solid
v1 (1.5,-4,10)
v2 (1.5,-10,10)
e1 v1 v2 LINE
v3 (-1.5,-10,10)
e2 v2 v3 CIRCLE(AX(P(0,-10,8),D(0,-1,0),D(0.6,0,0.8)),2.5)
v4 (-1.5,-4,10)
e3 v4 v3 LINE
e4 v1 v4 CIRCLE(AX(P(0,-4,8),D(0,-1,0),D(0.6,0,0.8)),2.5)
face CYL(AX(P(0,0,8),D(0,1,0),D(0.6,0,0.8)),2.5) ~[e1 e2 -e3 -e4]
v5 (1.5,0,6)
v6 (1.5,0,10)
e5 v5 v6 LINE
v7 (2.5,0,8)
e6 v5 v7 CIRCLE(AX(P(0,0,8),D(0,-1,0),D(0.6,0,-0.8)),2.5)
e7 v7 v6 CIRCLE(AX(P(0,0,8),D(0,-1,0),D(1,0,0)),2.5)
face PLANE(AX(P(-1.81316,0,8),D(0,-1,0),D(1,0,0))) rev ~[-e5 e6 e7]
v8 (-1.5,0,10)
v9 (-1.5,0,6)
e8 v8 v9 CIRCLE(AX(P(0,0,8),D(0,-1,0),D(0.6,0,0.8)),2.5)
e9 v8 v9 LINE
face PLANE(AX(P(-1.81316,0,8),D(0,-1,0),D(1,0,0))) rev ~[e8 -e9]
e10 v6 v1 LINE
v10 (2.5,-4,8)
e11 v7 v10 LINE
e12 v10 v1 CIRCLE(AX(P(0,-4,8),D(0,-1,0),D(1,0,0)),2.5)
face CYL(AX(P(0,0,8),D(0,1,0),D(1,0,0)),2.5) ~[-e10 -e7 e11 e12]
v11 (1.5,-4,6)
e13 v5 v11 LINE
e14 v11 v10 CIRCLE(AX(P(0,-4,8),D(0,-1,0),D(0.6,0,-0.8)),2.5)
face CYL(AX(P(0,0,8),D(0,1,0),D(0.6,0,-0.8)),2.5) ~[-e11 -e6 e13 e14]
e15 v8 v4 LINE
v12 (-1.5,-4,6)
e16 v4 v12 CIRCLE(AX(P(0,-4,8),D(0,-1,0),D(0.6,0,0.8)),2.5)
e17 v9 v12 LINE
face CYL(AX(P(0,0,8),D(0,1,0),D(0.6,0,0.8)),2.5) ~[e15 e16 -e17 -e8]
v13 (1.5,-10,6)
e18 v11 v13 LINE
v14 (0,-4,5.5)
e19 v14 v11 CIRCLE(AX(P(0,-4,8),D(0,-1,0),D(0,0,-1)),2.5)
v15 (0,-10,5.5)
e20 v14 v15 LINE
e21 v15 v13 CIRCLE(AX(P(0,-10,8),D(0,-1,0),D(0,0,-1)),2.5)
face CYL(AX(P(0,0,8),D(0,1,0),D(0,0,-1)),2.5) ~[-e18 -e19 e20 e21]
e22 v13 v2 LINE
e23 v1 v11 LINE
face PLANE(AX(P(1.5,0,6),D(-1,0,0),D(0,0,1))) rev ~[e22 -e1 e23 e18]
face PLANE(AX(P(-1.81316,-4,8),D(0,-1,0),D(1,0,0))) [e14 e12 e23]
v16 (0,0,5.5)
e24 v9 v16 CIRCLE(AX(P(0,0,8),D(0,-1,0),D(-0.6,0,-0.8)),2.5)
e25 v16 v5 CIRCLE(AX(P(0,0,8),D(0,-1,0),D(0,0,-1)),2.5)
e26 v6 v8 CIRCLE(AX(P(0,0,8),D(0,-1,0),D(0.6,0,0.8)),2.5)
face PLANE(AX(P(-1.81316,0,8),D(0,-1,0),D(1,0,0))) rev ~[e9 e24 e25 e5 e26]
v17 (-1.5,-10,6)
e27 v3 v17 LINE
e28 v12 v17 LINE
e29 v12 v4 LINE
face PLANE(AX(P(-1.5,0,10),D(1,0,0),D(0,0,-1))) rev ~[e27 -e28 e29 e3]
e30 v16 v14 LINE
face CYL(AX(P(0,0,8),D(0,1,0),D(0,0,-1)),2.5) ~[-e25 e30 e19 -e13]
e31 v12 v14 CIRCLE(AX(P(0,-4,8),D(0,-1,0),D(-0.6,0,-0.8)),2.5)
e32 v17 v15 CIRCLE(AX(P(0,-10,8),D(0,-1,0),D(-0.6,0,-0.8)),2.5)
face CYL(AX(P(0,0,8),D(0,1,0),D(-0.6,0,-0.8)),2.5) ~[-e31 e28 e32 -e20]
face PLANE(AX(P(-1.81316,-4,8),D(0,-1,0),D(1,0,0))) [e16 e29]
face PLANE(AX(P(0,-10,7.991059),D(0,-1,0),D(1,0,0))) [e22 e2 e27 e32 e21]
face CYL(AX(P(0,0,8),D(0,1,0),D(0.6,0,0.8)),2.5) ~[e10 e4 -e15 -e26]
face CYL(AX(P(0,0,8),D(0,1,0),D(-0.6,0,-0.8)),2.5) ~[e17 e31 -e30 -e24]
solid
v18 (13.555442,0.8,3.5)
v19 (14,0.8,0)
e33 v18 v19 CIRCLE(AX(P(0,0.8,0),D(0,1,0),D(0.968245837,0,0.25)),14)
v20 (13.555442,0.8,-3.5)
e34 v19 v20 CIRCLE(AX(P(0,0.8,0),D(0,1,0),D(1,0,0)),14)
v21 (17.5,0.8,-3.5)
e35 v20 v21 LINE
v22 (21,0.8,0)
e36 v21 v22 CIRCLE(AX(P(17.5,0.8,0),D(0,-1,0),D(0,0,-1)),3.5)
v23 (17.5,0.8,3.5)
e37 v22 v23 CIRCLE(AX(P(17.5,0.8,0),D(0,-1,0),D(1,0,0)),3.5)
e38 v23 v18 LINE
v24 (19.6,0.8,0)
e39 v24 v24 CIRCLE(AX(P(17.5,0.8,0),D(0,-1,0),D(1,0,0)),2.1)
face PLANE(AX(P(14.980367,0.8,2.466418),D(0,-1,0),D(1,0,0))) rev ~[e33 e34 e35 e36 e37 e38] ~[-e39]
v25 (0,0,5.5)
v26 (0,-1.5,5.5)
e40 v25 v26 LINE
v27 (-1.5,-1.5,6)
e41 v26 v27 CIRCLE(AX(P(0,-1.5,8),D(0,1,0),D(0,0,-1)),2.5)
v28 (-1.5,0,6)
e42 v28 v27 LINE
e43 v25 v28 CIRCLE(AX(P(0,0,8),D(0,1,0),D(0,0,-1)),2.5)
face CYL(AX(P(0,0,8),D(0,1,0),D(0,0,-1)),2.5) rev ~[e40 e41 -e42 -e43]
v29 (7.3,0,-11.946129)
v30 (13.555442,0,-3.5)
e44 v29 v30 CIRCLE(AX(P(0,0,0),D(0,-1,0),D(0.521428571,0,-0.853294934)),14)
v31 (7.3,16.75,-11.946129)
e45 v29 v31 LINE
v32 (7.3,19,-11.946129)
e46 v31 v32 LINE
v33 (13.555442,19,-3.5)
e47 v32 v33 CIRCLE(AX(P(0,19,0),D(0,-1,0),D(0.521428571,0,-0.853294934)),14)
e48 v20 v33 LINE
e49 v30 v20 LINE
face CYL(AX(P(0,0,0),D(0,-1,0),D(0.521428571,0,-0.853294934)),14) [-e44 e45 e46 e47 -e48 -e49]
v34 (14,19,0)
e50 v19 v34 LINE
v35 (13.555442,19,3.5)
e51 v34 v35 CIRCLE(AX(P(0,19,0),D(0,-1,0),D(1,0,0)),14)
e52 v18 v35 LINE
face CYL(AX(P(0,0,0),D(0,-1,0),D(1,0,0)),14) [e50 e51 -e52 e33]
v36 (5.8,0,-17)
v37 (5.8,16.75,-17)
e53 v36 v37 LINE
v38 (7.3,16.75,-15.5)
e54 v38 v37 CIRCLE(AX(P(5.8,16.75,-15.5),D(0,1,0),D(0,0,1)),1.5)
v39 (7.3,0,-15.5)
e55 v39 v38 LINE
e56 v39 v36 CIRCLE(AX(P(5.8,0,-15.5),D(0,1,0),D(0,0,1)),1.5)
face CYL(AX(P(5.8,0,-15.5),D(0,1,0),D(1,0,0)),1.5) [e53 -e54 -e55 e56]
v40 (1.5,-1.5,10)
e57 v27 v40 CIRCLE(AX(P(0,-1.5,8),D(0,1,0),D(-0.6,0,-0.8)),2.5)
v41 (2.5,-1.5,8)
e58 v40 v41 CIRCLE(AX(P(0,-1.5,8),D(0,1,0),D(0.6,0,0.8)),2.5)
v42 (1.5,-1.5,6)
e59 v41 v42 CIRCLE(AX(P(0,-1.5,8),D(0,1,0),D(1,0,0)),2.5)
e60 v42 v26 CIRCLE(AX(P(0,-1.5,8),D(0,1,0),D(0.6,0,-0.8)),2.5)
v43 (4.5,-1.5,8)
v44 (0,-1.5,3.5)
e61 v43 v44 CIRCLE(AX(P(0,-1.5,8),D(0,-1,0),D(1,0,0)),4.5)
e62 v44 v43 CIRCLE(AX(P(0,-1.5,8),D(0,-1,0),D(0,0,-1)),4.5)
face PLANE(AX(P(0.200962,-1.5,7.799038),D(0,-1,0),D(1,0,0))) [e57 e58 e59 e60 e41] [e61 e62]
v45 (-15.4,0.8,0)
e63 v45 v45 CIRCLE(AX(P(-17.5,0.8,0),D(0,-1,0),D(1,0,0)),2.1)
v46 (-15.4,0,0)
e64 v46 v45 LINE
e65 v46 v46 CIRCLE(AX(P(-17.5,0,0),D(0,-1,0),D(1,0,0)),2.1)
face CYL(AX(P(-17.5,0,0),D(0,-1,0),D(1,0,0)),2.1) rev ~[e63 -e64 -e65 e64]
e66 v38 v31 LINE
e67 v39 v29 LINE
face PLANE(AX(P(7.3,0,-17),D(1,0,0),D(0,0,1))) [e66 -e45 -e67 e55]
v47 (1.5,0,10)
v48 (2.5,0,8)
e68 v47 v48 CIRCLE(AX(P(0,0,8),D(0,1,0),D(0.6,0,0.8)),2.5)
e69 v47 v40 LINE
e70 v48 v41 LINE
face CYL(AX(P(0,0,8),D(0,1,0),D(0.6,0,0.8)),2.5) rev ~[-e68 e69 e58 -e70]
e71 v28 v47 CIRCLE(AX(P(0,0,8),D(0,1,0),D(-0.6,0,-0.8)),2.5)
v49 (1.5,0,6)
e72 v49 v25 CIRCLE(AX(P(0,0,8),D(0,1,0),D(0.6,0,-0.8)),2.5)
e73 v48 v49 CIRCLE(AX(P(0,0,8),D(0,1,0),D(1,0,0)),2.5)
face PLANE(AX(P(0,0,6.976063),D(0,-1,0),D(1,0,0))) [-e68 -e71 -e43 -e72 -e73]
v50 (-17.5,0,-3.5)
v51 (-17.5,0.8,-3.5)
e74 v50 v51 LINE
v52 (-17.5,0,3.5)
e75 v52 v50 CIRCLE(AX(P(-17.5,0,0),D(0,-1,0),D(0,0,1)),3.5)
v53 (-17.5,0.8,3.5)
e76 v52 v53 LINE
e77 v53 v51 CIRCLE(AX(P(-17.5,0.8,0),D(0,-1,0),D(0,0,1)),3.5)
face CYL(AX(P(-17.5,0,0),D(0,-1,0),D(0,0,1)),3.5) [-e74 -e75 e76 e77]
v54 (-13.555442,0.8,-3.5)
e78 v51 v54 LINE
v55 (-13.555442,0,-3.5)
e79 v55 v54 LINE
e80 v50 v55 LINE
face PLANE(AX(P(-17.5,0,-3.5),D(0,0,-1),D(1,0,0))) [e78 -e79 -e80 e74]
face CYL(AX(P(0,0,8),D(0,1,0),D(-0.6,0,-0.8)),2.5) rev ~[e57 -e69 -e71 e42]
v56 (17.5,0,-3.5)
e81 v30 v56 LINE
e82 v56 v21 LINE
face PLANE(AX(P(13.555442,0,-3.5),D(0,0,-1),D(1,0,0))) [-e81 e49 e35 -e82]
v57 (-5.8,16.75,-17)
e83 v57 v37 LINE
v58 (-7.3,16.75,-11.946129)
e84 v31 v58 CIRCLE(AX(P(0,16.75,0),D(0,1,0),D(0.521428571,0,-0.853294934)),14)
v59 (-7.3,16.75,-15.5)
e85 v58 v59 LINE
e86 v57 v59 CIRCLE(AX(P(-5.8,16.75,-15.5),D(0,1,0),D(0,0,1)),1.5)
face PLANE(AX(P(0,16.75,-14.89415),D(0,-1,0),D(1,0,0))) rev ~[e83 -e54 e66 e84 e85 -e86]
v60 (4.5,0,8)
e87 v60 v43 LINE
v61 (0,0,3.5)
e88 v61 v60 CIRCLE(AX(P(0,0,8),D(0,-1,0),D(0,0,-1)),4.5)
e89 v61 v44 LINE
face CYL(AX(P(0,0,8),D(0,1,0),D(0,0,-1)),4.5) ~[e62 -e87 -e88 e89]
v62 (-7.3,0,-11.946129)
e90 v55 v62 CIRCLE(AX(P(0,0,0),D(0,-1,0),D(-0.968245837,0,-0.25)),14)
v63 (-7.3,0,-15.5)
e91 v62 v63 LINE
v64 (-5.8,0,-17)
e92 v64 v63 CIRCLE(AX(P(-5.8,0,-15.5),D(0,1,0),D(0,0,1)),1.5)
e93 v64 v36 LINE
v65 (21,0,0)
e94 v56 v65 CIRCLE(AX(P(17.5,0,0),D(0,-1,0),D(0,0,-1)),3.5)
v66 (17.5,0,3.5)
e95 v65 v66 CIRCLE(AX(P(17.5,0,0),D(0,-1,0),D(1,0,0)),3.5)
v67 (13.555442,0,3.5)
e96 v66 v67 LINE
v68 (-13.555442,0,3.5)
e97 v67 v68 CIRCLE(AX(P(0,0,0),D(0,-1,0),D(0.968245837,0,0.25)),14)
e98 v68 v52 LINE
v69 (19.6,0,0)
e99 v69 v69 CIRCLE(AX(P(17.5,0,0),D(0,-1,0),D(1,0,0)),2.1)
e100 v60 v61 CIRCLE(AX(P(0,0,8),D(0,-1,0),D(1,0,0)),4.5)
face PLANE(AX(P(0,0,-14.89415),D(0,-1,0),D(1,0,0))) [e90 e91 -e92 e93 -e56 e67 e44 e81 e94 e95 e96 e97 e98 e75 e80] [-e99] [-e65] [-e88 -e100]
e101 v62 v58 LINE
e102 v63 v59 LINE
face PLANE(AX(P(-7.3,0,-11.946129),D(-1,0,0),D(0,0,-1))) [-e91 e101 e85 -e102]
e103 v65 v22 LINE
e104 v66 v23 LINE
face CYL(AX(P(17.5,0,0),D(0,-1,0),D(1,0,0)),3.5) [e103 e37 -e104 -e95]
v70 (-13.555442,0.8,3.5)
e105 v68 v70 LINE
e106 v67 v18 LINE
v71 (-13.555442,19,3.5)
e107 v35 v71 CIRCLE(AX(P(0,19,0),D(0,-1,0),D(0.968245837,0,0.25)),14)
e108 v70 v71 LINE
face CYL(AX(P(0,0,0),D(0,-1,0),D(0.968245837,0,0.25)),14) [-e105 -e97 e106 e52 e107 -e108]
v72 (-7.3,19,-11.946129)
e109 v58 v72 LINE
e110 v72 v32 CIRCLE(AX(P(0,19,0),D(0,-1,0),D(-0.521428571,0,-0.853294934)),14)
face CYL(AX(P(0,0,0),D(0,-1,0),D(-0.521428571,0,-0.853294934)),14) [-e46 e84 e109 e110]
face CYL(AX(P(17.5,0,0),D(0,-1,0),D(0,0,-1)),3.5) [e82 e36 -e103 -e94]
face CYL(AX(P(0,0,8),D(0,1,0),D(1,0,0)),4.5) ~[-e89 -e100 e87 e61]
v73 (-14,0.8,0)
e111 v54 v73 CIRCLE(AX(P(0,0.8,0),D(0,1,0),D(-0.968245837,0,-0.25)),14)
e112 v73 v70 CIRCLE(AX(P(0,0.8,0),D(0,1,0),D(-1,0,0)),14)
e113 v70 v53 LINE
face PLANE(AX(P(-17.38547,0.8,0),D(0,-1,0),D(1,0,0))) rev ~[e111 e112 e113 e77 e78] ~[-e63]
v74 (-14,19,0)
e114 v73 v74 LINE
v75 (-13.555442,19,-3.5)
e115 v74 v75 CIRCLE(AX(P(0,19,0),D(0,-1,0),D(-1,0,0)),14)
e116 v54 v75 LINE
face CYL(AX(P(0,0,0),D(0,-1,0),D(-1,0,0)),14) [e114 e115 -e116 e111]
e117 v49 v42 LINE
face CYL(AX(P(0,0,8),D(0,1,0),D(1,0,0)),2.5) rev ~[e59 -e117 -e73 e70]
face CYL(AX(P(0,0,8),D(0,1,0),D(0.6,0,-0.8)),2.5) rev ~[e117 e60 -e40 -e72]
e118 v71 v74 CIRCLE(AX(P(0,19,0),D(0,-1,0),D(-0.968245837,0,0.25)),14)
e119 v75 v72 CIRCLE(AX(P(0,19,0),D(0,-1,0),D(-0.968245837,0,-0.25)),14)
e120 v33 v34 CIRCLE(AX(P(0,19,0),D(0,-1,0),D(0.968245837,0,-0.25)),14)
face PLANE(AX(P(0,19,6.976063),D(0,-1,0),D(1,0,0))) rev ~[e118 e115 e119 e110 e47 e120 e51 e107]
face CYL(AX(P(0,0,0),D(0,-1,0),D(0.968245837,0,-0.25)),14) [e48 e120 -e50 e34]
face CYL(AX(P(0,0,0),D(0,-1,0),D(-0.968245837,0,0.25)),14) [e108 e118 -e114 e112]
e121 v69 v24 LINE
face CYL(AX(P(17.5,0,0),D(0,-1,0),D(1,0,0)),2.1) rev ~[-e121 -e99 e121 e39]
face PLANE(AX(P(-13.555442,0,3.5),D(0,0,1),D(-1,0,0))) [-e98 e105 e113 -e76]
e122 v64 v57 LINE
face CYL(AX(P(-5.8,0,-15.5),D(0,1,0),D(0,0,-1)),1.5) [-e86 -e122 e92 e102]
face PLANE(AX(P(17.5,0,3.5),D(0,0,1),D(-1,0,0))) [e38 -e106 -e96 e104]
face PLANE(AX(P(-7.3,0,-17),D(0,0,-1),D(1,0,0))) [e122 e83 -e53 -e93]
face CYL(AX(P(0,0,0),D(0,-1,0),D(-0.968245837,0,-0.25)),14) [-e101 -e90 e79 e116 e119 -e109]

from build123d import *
from build123d import SkipClean  # not in build123d's __all__

# Parameters (mm, degrees)
F1_DEPTH = 1.5
F2_DEPTH = 19
F0_R     = 2.1
F3_DEPTH = 0.8
F4_DEPTH = 4
F5_DEPTH = 10
F6_DEPTH = 16.75
F7_R     = 1.5


with BuildPart() as f1:
    # F0 (on Front) → F1 (new body)
    with BuildSketch(Plane.XZ):
        with BuildLine():
            ThreePointArc((4.5, 8), (-3.1819805153, 11.1819805153), (0, 3.5))
            ThreePointArc((0, 3.5), (3.1819805153, 4.8180194847), (4.5, 8))
        make_face()
        with BuildLine():
            ThreePointArc((1.5, 6), (0.790569415, 5.6282917549), (0, 5.5))
            ThreePointArc((0, 5.5), (-0.790569415, 5.6282917549), (-1.5, 6))
            ThreePointArc((-1.5, 6), (-2.5, 8), (-1.5, 10))
            ThreePointArc((-1.5, 10), (0, 10.5), (1.5, 10))
            ThreePointArc((1.5, 10), (2.2360679775, 9.1180339887), (2.5, 8))
            ThreePointArc((2.5, 8), (2.2360679775, 6.8819660113), (1.5, 6))
        make_face(mode=Mode.SUBTRACT)
    extrude(amount=F1_DEPTH)

    # F0 (on Front) → F2 (join)
    with BuildSketch(Plane.XZ):
        with BuildLine():
            Line((0, 3.5), (13.5554417117, 3.5))
            ThreePointArc((13.5554417117, 3.5), (0, 14), (-13.5554417117, 3.5))
            Line((-13.5554417117, 3.5), (0, 3.5))
        make_face()
        with BuildLine():
            ThreePointArc((4.5, 8), (3.1819805153, 4.8180194847), (0, 3.5))
            ThreePointArc((0, 3.5), (-3.1819805153, 11.1819805153), (4.5, 8))
        make_face(mode=Mode.SUBTRACT)
        with BuildLine():
            ThreePointArc((-13.5554417117, -3.5), (-11.250406053, -8.3323684294), (-7.3, -11.9461290802))
            Line((-7.3, -11.9461290802), (-7.3, -3.5))
            Line((-7.3, -3.5), (-13.5554417117, -3.5))
        make_face()
        with BuildLine():
            ThreePointArc((4.5, 8), (-3.1819805153, 11.1819805153), (0, 3.5))
            ThreePointArc((0, 3.5), (3.1819805153, 4.8180194847), (4.5, 8))
        make_face()
        with BuildLine():
            ThreePointArc((1.5, 6), (0.790569415, 5.6282917549), (0, 5.5))
            ThreePointArc((0, 5.5), (-0.790569415, 5.6282917549), (-1.5, 6))
            ThreePointArc((-1.5, 6), (-2.5, 8), (-1.5, 10))
            ThreePointArc((-1.5, 10), (0, 10.5), (1.5, 10))
            ThreePointArc((1.5, 10), (2.2360679775, 9.1180339887), (2.5, 8))
            ThreePointArc((2.5, 8), (2.2360679775, 6.8819660113), (1.5, 6))
        make_face(mode=Mode.SUBTRACT)
        with BuildLine():
            ThreePointArc((-1.5, 10), (-2.5, 8), (-1.5, 6))
            Line((-1.5, 6), (-1.5, 10))
        make_face()
        with BuildLine():
            Line((1.5, 10), (1.5, 6))
            ThreePointArc((1.5, 6), (2.2360679775, 6.8819660113), (2.5, 8))
            ThreePointArc((2.5, 8), (2.2360679775, 9.1180339887), (1.5, 10))
        make_face()
        with BuildLine():
            ThreePointArc((-1.5, 6), (-0.790569415, 5.6282917549), (0, 5.5))
            ThreePointArc((0, 5.5), (0.790569415, 5.6282917549), (1.5, 6))
            Line((1.5, 6), (1.5, 10))
            ThreePointArc((1.5, 10), (0, 10.5), (-1.5, 10))
            Line((-1.5, 10), (-1.5, 6))
        make_face()
        with BuildLine():
            ThreePointArc((13.5554417117, -3.5), (13.8884157477, -1.7640600948), (14, 0))
            ThreePointArc((14, 0), (13.8884157477, 1.7640600948), (13.5554417117, 3.5))
            Line((13.5554417117, 3.5), (0, 3.5))
            Line((0, 3.5), (-13.5554417117, 3.5))
            ThreePointArc((-13.5554417117, 3.5), (-13.8884157477, 1.7640600948), (-14, 0))
            ThreePointArc((-14, 0), (-13.8884157477, -1.7640600948), (-13.5554417117, -3.5))
            Line((-13.5554417117, -3.5), (-7.3, -3.5))
            Line((-7.3, -3.5), (7.3, -3.5))
            Line((7.3, -3.5), (13.5554417117, -3.5))
        make_face()
        with BuildLine():
            ThreePointArc((-7.3, -11.9461290802), (0, -14), (7.3, -11.9461290802))
            Line((7.3, -11.9461290802), (7.3, -3.5))
            Line((7.3, -3.5), (-7.3, -3.5))
            Line((-7.3, -3.5), (-7.3, -11.9461290802))
        make_face()
        with BuildLine():
            ThreePointArc((7.3, -11.9461290802), (11.250406053, -8.3323684294), (13.5554417117, -3.5))
            Line((13.5554417117, -3.5), (7.3, -3.5))
            Line((7.3, -3.5), (7.3, -11.9461290802))
        make_face()
    extrude(amount=-F2_DEPTH)

    # F0 (on Front) → F3 (join)
    with BuildSketch(Plane.XZ):
        with BuildLine():
            ThreePointArc((-17.5, -3.5), (-15.0251262658, -2.4748737342), (-14, 0))
            ThreePointArc((-14, 0), (-15.0251262658, 2.4748737342), (-17.5, 3.5))
            ThreePointArc((-17.5, 3.5), (-21, 0), (-17.5, -3.5))
        make_face()
        with Locations((-17.5, 0)):
            Circle(F0_R, mode=Mode.SUBTRACT)
        with BuildLine():
            ThreePointArc((-14, 0), (-13.8884157477, 1.7640600948), (-13.5554417117, 3.5))
            Line((-13.5554417117, 3.5), (-17.5, 3.5))
            ThreePointArc((-17.5, 3.5), (-15.0251262658, 2.4748737342), (-14, 0))
        make_face()
        with BuildLine():
            ThreePointArc((-13.5554417117, -3.5), (-13.8884157477, -1.7640600948), (-14, 0))
            ThreePointArc((-14, 0), (-15.0251262658, -2.4748737342), (-17.5, -3.5))
            Line((-17.5, -3.5), (-13.5554417117, -3.5))
        make_face()
        with BuildLine():
            ThreePointArc((13.5554417117, 3.5), (13.8884157477, 1.7640600948), (14, 0))
            ThreePointArc((14, 0), (15.0251262658, 2.4748737342), (17.5, 3.5))
            Line((17.5, 3.5), (13.5554417117, 3.5))
        make_face()
        with BuildLine():
            ThreePointArc((17.5, 3.5), (15.0251262658, 2.4748737342), (14, 0))
            ThreePointArc((14, 0), (15.0251262658, -2.4748737342), (17.5, -3.5))
            ThreePointArc((17.5, -3.5), (19.9748737342, -2.4748737342), (21, 0))
            ThreePointArc((21, 0), (19.9748737342, 2.4748737342), (17.5, 3.5))
        make_face()
        with Locations((17.5, 0)):
            Circle(F0_R, mode=Mode.SUBTRACT)
        with BuildLine():
            ThreePointArc((17.5, -3.5), (15.0251262658, -2.4748737342), (14, 0))
            ThreePointArc((14, 0), (13.8884157477, -1.7640600948), (13.5554417117, -3.5))
            Line((13.5554417117, -3.5), (17.5, -3.5))
        make_face()
    extrude(amount=-F3_DEPTH)

    # F0 (on Front) → F6 (join)
    with BuildSketch(Plane.XZ):
        with BuildLine():
            Line((7.3, -17), (7.3, -11.9461290802))
            ThreePointArc((7.3, -11.9461290802), (0, -14), (-7.3, -11.9461290802))
            Line((-7.3, -11.9461290802), (-7.3, -17))
            Line((-7.3, -17), (7.3, -17))
        make_face()
    extrude(amount=-F6_DEPTH)

    # F7
    f7_edges = [f1.edges().sort_by_distance(p)[0] for p in [
        (-7.3, 8.375, -17),
        (7.3, 8.375, -17),
    ]]
    fillet(f7_edges, radius=F7_R)


with BuildPart() as f4:
    # F0 (on Front) → F4 (new body)
    with BuildSketch(Plane.XZ):
        with BuildLine():
            ThreePointArc((-1.5, 10), (-2.5, 8), (-1.5, 6))
            Line((-1.5, 6), (-1.5, 10))
        make_face()
        with BuildLine():
            ThreePointArc((-1.5, 6), (-0.790569415, 5.6282917549), (0, 5.5))
            ThreePointArc((0, 5.5), (0.790569415, 5.6282917549), (1.5, 6))
            Line((1.5, 6), (1.5, 10))
            ThreePointArc((1.5, 10), (0, 10.5), (-1.5, 10))
            Line((-1.5, 10), (-1.5, 6))
        make_face()
        with BuildLine():
            Line((1.5, 10), (1.5, 6))
            ThreePointArc((1.5, 6), (2.2360679775, 6.8819660113), (2.5, 8))
            ThreePointArc((2.5, 8), (2.2360679775, 9.1180339887), (1.5, 10))
        make_face()
    extrude(amount=F4_DEPTH)

    # F0 (on Front) → F5 (join)
    with BuildSketch(Plane.XZ):
        with BuildLine():
            ThreePointArc((-1.5, 6), (-0.790569415, 5.6282917549), (0, 5.5))
            ThreePointArc((0, 5.5), (0.790569415, 5.6282917549), (1.5, 6))
            Line((1.5, 6), (1.5, 10))
            ThreePointArc((1.5, 10), (0, 10.5), (-1.5, 10))
            Line((-1.5, 10), (-1.5, 6))
        make_face()
    with SkipClean():  # cleaning this boolean's faces spoils the solid; the shape is the same uncleaned
        extrude(amount=F5_DEPTH)


solid = Compound([f1.part, f4.part])
